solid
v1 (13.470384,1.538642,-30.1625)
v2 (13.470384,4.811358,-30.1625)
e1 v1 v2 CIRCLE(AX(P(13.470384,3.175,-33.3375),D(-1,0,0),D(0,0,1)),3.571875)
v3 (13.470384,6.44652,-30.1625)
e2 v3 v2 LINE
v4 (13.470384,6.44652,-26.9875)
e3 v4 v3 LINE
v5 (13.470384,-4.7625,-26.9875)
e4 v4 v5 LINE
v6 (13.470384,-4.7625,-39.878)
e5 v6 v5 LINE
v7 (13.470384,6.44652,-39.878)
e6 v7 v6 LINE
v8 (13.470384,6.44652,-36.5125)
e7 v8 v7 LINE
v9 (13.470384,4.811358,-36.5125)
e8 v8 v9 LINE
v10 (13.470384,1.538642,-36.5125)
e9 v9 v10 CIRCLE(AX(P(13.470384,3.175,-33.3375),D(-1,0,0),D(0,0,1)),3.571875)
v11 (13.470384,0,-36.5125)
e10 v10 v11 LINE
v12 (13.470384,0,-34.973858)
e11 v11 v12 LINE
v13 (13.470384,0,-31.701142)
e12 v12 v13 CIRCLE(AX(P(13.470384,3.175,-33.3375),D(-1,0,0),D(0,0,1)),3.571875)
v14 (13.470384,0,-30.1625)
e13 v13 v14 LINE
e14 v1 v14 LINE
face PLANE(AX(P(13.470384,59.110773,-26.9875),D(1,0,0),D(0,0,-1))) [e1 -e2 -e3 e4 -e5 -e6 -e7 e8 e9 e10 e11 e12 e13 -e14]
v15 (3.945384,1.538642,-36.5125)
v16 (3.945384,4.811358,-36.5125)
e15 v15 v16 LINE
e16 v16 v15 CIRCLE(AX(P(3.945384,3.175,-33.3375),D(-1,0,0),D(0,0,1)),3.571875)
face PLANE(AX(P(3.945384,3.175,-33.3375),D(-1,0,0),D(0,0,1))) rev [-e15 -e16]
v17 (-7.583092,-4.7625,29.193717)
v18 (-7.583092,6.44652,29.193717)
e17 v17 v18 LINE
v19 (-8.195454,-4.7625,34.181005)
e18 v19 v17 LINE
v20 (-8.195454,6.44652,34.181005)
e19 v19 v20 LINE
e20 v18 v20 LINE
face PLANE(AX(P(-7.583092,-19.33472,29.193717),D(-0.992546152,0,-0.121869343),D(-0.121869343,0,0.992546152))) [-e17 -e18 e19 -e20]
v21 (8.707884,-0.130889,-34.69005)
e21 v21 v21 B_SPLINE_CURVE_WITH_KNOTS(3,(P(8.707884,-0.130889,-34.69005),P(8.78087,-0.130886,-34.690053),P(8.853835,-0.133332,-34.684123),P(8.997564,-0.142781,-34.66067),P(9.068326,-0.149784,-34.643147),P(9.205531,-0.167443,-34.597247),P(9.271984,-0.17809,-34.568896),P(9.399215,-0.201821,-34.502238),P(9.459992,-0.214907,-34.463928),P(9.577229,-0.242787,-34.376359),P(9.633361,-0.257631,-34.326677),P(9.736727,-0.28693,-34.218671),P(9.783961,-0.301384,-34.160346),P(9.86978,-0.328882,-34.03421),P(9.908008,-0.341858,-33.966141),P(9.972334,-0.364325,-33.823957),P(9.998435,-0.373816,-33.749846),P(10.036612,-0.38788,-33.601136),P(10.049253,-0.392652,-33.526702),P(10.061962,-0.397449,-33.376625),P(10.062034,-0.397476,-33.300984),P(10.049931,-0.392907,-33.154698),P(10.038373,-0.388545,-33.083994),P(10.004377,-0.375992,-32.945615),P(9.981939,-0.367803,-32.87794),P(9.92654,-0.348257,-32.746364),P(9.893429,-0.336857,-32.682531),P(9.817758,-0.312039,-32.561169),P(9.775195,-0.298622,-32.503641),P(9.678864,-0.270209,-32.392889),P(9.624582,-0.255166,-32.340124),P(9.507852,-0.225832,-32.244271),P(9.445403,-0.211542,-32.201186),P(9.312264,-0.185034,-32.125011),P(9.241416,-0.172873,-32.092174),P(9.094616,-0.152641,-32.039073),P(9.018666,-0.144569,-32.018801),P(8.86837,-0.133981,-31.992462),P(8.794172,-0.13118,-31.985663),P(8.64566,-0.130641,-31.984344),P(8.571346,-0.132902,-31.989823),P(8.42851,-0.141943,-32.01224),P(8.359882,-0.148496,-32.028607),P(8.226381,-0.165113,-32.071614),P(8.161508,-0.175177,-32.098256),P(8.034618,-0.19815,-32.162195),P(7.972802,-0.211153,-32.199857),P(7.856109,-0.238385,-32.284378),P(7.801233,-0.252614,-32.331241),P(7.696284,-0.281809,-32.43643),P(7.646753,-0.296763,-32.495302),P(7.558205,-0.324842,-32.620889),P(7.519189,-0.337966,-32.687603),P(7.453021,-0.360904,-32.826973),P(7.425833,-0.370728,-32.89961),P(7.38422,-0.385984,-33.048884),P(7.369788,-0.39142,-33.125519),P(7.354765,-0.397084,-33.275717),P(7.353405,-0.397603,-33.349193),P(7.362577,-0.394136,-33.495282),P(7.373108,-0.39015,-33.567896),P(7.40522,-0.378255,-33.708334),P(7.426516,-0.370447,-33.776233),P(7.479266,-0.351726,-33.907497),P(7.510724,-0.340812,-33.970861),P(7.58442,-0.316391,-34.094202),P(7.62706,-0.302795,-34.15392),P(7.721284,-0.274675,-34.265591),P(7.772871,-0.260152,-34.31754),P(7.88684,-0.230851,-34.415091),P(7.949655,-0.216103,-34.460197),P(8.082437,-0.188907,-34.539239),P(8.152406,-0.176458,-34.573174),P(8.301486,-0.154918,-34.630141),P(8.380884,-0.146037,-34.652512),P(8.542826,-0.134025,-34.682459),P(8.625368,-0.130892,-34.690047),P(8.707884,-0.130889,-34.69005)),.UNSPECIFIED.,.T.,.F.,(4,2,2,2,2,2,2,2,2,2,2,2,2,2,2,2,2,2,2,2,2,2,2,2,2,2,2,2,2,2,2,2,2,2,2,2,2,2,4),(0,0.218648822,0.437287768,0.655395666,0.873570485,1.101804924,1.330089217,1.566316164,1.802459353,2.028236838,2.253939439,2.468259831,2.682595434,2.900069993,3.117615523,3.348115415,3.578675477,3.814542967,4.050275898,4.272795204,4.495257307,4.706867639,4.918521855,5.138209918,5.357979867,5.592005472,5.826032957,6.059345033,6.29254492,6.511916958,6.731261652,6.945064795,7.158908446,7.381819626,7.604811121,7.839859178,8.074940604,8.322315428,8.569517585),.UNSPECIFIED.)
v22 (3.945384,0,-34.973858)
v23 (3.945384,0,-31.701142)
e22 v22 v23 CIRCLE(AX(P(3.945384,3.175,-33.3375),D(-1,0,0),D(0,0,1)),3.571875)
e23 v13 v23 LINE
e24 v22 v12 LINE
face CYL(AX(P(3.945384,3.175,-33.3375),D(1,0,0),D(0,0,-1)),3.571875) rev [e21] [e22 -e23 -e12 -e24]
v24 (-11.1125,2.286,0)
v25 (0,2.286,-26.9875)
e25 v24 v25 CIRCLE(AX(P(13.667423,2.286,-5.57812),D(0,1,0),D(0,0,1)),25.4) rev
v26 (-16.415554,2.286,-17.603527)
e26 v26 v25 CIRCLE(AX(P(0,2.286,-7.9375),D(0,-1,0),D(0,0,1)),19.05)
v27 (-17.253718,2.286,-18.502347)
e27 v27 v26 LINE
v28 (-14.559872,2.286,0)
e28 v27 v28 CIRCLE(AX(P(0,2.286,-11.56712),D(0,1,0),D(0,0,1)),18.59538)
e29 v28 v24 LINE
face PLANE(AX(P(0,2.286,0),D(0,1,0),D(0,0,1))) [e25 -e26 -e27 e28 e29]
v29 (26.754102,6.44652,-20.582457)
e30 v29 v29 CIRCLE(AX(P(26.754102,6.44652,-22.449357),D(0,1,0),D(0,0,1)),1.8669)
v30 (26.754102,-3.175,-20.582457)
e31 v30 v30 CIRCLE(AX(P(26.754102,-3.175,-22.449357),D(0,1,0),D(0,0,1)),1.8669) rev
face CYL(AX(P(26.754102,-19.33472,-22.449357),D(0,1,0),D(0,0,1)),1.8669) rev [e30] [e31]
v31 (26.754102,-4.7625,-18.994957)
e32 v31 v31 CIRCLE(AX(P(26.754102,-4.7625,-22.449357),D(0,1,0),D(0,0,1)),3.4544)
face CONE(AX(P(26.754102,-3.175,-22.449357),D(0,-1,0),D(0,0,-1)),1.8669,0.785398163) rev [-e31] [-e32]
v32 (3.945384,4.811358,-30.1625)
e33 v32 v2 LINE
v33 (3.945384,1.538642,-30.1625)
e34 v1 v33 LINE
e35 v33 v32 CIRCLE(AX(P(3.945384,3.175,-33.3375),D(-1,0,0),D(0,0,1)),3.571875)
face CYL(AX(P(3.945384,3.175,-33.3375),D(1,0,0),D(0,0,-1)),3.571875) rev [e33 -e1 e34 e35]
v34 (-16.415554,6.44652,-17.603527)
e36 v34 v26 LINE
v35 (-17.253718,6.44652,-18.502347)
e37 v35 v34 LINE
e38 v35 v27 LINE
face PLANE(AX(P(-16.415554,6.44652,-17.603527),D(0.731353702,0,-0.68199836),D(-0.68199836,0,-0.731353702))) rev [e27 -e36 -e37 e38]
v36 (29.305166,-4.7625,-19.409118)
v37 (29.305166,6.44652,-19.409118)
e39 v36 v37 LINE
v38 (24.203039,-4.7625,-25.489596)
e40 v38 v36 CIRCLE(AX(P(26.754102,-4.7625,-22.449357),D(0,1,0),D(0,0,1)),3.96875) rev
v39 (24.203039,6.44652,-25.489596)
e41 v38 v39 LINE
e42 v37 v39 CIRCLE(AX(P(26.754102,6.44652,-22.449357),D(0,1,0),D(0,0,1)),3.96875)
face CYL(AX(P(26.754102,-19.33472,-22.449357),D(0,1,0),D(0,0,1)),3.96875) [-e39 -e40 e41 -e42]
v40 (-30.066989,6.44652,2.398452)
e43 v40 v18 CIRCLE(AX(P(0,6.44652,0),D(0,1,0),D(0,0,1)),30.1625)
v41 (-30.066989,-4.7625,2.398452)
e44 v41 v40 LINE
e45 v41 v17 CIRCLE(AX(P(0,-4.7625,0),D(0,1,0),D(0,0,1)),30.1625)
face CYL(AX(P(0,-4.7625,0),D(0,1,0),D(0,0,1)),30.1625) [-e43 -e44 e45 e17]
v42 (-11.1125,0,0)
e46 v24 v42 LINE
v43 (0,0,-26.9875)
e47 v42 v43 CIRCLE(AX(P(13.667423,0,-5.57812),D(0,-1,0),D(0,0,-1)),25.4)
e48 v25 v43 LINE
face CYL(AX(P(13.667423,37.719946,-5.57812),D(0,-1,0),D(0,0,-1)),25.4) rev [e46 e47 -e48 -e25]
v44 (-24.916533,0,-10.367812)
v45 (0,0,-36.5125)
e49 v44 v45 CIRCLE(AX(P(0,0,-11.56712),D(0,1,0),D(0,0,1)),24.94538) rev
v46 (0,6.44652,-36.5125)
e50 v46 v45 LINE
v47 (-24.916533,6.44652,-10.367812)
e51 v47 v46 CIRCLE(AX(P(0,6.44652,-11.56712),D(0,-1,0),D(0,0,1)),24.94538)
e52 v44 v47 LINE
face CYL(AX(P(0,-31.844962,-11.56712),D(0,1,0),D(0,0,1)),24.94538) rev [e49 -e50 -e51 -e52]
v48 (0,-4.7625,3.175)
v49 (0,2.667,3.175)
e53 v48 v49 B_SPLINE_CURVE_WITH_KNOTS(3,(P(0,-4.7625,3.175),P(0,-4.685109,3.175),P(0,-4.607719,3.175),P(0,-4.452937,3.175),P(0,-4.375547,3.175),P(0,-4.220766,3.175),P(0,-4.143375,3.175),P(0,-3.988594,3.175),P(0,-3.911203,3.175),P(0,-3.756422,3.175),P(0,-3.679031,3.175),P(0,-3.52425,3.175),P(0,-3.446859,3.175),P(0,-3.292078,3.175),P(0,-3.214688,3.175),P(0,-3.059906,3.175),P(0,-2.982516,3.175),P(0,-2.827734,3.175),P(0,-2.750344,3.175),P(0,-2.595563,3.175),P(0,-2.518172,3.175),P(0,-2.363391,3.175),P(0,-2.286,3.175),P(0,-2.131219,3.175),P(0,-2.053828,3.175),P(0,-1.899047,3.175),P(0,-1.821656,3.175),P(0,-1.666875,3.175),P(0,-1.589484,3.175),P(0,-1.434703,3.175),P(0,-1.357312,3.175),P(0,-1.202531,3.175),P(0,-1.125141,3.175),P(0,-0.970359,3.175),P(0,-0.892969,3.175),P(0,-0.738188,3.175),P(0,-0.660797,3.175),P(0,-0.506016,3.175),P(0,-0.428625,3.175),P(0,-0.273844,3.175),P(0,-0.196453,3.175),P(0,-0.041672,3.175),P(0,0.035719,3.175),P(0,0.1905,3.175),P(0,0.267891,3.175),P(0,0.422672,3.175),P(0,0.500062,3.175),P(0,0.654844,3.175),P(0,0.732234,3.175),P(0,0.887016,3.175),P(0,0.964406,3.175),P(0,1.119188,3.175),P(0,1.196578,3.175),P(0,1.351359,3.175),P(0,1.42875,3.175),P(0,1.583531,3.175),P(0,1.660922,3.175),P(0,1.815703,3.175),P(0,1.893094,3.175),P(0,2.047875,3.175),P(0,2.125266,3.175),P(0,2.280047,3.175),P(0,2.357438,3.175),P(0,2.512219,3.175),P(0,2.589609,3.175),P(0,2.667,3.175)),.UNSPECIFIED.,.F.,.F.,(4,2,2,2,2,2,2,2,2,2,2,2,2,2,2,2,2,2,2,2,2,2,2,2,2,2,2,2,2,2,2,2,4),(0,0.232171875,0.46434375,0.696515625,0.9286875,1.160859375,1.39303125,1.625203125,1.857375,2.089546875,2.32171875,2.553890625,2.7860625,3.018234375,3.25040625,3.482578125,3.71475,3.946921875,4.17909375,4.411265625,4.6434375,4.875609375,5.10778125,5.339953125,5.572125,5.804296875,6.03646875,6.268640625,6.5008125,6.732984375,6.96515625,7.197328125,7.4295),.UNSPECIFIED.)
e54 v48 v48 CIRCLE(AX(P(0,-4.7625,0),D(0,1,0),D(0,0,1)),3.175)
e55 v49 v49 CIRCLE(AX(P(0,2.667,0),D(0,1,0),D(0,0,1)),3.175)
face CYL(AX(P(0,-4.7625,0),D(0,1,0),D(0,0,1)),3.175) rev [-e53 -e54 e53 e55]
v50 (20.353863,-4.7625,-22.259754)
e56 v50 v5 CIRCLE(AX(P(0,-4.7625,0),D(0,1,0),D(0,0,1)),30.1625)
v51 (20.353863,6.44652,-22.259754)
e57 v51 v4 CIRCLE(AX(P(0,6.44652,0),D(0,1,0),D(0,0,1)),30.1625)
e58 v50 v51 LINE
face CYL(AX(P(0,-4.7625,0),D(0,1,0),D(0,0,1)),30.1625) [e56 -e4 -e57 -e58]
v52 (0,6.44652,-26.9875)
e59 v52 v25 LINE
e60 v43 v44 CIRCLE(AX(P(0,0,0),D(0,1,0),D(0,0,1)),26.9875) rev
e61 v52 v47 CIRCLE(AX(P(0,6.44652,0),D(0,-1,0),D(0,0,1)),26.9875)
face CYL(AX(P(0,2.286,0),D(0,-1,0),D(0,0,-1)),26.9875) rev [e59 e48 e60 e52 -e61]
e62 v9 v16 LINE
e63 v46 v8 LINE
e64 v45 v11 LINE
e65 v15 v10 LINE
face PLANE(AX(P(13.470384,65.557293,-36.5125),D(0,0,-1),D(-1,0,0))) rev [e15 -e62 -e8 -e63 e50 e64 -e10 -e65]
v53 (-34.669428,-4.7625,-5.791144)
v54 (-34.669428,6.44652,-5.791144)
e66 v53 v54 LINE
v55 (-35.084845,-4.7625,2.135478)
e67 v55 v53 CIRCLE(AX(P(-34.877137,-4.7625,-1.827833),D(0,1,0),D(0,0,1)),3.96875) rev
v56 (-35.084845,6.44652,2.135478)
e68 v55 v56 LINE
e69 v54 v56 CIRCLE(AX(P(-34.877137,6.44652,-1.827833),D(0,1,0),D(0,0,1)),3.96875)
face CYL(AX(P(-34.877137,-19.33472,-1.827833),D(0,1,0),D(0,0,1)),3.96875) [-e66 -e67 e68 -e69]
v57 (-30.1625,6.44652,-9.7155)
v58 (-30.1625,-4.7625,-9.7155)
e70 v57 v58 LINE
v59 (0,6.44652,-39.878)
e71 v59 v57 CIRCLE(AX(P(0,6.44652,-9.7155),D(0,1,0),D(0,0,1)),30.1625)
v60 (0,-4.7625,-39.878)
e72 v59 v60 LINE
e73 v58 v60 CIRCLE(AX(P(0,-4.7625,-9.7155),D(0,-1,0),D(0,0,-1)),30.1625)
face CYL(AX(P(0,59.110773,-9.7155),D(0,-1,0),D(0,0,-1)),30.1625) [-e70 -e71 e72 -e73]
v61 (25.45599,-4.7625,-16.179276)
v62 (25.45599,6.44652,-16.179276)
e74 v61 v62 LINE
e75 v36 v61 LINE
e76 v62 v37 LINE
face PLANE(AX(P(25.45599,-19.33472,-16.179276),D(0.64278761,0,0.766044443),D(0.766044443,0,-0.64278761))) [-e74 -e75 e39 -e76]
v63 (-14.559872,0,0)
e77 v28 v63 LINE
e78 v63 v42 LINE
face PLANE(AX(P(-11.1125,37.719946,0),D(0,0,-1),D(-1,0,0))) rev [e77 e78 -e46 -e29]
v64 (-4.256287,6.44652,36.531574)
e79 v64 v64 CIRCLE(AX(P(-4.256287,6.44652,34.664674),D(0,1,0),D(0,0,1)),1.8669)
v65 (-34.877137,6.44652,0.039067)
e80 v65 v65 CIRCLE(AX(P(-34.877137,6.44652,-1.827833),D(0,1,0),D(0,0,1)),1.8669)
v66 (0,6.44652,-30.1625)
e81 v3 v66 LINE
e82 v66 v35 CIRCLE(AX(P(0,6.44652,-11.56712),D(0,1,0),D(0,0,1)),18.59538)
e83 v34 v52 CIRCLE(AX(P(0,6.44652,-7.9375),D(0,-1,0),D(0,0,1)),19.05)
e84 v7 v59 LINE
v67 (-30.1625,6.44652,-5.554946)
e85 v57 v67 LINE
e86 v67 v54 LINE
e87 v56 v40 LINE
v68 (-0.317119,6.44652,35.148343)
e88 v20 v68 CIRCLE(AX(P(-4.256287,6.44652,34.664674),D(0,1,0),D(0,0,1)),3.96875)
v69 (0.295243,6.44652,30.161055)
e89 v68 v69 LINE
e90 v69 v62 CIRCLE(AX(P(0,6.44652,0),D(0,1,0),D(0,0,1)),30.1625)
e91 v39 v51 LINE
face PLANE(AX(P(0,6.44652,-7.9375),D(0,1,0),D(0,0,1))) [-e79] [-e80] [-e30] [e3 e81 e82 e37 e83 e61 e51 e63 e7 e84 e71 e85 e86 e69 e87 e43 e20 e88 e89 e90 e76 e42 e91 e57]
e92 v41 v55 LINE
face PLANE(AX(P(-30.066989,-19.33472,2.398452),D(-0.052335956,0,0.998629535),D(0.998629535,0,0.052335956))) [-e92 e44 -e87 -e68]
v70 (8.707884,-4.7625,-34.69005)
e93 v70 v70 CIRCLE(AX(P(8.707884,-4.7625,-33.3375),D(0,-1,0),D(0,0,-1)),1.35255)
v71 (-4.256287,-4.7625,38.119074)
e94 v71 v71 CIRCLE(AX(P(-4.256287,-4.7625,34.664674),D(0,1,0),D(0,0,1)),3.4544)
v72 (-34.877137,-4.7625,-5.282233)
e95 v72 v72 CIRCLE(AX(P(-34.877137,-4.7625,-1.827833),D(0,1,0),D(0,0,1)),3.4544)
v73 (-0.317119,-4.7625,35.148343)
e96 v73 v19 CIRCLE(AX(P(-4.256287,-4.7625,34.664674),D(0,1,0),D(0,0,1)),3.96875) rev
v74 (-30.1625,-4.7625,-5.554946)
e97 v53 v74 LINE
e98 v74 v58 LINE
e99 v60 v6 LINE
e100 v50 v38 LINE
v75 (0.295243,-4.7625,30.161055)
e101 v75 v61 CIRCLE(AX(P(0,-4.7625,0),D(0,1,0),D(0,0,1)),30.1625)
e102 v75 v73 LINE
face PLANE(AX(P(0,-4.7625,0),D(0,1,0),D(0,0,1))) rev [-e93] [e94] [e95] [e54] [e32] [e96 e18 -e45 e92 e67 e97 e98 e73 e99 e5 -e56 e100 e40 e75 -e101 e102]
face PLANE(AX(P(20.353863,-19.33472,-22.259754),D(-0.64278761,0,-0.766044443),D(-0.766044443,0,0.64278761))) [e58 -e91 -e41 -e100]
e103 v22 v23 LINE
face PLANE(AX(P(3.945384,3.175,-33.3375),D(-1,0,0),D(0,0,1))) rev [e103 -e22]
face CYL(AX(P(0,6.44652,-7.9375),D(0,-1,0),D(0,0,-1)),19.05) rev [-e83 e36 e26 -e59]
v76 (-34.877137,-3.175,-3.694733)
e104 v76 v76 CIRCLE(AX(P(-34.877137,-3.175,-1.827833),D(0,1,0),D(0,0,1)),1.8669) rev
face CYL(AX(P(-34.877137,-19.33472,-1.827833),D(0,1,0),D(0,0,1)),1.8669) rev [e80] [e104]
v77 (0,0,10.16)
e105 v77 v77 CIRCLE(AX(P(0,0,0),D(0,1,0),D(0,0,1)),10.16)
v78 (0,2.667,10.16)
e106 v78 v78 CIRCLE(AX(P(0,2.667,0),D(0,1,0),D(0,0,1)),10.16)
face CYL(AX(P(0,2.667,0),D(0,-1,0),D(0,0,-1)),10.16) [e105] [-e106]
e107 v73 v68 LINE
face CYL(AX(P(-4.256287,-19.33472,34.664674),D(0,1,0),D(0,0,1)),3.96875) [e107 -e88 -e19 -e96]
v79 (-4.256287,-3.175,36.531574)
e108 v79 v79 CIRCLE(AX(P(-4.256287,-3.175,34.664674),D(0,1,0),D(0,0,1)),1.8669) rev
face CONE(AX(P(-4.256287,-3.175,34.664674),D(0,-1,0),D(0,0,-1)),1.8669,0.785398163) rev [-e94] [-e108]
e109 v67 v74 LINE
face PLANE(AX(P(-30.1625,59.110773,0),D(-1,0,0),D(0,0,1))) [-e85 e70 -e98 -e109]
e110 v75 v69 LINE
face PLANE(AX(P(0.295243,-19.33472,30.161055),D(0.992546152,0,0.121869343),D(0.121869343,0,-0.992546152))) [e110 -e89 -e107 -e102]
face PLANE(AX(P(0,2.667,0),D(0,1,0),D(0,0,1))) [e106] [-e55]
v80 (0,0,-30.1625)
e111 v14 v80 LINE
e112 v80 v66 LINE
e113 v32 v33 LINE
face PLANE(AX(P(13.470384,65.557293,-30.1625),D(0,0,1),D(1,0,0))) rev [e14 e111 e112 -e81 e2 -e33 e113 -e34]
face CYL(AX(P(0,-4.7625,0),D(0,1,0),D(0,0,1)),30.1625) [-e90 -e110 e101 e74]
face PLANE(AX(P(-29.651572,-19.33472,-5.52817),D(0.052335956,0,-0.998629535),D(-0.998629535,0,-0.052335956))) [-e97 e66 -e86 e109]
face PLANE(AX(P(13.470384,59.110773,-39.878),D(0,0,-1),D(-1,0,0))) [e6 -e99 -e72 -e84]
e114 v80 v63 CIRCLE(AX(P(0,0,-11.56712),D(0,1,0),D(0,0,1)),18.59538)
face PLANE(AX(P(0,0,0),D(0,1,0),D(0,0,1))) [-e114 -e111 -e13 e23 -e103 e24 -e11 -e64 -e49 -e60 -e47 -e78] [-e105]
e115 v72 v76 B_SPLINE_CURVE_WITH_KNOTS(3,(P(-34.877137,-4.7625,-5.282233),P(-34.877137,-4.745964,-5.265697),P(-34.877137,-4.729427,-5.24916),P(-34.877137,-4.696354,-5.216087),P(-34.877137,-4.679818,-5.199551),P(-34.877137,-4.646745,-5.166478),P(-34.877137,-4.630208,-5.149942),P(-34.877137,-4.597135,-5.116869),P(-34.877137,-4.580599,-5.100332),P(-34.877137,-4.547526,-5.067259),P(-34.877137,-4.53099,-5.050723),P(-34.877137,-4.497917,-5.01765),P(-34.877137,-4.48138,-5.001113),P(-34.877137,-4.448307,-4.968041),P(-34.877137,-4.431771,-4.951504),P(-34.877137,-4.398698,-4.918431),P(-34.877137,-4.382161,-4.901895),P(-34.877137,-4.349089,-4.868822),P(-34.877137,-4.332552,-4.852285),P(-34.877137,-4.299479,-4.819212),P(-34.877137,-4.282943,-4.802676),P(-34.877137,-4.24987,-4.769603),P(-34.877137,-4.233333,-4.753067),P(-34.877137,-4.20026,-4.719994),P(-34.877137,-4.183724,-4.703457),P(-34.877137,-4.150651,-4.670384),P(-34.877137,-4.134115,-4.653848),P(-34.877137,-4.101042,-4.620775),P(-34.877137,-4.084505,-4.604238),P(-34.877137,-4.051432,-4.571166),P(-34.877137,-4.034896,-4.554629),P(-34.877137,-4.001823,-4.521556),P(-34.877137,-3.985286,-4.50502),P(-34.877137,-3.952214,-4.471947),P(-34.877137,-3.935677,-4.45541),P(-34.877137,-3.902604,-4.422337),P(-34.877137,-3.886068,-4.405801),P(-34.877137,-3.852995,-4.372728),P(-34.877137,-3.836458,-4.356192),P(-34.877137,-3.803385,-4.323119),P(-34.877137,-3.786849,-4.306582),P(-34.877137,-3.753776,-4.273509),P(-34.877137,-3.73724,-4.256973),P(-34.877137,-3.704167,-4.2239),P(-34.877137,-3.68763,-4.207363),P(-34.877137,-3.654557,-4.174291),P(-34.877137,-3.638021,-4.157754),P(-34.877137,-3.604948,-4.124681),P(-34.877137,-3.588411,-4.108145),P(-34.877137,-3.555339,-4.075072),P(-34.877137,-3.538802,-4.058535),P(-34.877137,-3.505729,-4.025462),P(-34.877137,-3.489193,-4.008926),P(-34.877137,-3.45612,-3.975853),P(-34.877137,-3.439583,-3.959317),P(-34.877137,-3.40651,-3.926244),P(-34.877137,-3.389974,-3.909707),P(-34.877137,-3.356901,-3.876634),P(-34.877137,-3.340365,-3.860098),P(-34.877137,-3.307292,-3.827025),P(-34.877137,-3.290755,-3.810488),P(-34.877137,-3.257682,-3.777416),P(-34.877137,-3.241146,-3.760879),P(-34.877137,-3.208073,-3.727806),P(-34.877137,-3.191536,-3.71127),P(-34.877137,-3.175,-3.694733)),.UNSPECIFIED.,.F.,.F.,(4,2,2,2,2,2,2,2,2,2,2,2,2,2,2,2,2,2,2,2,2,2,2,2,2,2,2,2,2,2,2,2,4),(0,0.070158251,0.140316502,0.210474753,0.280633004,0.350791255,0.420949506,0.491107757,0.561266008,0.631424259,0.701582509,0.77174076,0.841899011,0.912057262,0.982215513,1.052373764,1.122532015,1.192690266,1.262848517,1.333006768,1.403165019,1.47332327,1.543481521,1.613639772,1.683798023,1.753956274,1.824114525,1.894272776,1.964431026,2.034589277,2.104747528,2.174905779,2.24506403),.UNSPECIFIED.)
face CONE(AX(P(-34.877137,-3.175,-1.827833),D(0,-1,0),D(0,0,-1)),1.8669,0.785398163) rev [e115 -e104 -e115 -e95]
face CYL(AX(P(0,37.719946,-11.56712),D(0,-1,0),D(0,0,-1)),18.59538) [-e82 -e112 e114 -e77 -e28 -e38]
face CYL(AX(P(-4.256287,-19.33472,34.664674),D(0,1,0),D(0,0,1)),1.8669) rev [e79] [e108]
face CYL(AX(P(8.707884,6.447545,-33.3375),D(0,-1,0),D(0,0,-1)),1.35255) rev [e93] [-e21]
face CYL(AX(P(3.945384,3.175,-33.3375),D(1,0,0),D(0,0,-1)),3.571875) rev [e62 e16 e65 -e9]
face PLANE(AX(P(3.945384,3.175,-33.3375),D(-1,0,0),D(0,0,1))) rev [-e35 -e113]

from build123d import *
from build123d.topology import SkipClean

# Parameters (mm, degrees)
SKETCH1_R          = 30.1625
SKETCH1_R_2        = 3.175
EXTRUDE1_DEPTH     = 4.7625
EXTRUDE2_START     = 2.286
SKETCH2_R          = 30.1625
SKETCH2_R_2        = 26.9875
EXTRUDE2_DEPTH     = 2.286
EXTRUDE3_DEPTH     = 2.286
CUT_EXTRUDE1_START = -2.286
CUT_EXTRUDE1_DEPTH = 2.286
EXTRUDE4_DEPTH     = 4.16052
EXTRUDE6_START     = -4.7625
EXTRUDE6_DEPTH     = 4.7625
EXTRUDE7_START     = 6.44652
EXTRUDE7_DEPTH     = 6.44652
EXTRUDE8_START     = -4.7625
EXTRUDE8_OUTLINE_R = 1.8669
EXTRUDE8_DEPTH     = 11.20902
EXTRUDE8_START_2   = 3.945384182
EXTRUDE8_2_DEPTH   = 9.525
EXTRUDE9_START     = 2.667
SKETCH11_R         = 10.16
SKETCH11_R_2       = 3.175
EXTRUDE9_DEPTH     = 2.667
CHAMFER1_SIZE      = 1.5875
SPLIT1_OUTLINE_W   = 1.35255
SPLIT1_OUTLINE_H   = 4.631769236


# Read off the part's stored shape, not the designer's step: Extrude8, Split1
with BuildPart() as part:
    # Sketch1 → Extrude1 (new body)
    with BuildSketch(Plane(origin=(0, 0, 0), x_dir=(1, 0, 0), z_dir=(0, 1, 0))):
        with Locations(Location((0, 0, 0), (0, 0, 270))):
            Circle(SKETCH1_R)
        with Locations(Location((0, 0, 0), (0, 0, 270))):
            Circle(SKETCH1_R_2, mode=Mode.SUBTRACT)
    extrude(amount=-EXTRUDE1_DEPTH)

    # Sketch2 → Extrude2 (add)
    with BuildSketch(Plane(origin=(0, 0, 0), x_dir=(-1, 0, 0), z_dir=(0, 1, 0)).offset(EXTRUDE2_START)):
        with Locations(Location((0, 0, 0), (0, 0, 90))):
            Circle(SKETCH2_R)
        with Locations(Location((0, 0, 0), (0, 0, 90))):
            Circle(SKETCH2_R_2, mode=Mode.SUBTRACT)
    extrude(amount=-EXTRUDE2_DEPTH)

    # Sketch3 → Extrude3 (add)
    with BuildSketch(Plane(origin=(0, 0, 0), x_dir=(-1, 0, 0), z_dir=(0, 1, 0))):
        with BuildLine():
            Line((0, -26.9875), (0, -30.1625))
            ThreePointArc((0, -30.1625), (16.746389739, -19.65084319), (14.559871939, 0))
            Line((14.559871939, 0), (11.1125, 0))
            ThreePointArc((11.1125, 0), (9.819400834, -15.249165049), (0, -26.9875))
        make_face()
    extrude(amount=EXTRUDE3_DEPTH)

    # Sketch4 → Cut-Extrude1 (cut)
    with BuildSketch(Plane(origin=(0, 2.286, 0), x_dir=(-1, 0, 0), z_dir=(0, 1, 0)).offset(CUT_EXTRUDE1_START)):
        with BuildLine():
            ThreePointArc((0, -30.1625), (13.425358958, -27.009926751), (24.044290895, -18.211218564))
            ThreePointArc((24.044290895, -18.211218564), (24.79254584, -14.324226887), (24.91653318, -10.367812235))
            ThreePointArc((24.91653318, -10.367812235), (20.915943614, -17.054279785), (15.171790072, -22.31909367))
            ThreePointArc((15.171790072, -22.31909367), (8.539646316, -28.085673104), (0, -30.1625))
        make_face()
    extrude(amount=CUT_EXTRUDE1_DEPTH, mode=Mode.SUBTRACT)

    # Sketch5 → Extrude4 (add)
    with SkipClean():  # the faces are left unmerged after this step: merging them gives an invalid solid
        with BuildSketch(Plane(origin=(0, 2.286, 0), x_dir=(-1, 0, 0), z_dir=(0, 1, 0))):
            with BuildLine():
                ThreePointArc((0, -30.1625), (10.41213166, -26.974120661), (17.253717724, -18.502347019))
                Line((17.253717724, -18.502347019), (16.415554359, -17.603526852))
                ThreePointArc((16.415554359, -17.603526852), (9.454223619, -24.475944781), (0, -26.9875))
                ThreePointArc((0, -26.9875), (-14.975376849, 22.451352843), (24.91653318, -10.367812235))
                ThreePointArc((24.91653318, -10.367812235), (24.79254584, -14.324226887), (24.044290895, -18.211218564))
                ThreePointArc((24.044290895, -18.211218564), (-13.425358958, 27.009926751), (0, -30.1625))
            make_face()
        extrude(amount=EXTRUDE4_DEPTH)

    # Sketch7 → Extrude6 (add)
    with BuildSketch(Plane.XZ.offset(4.7625).offset(EXTRUDE6_START)):
        with BuildLine():
            Line((13.470384182, -39.878), (0, -39.878))
            ThreePointArc((0, -39.878), (-21.328108288, -31.043608288), (-30.1625, -9.7155))
            Line((-30.1625, -9.7155), (-30.1625, 0))
            ThreePointArc((-30.1625, 0), (-21.328108288, -21.328108288), (0, -30.1625))
            ThreePointArc((0, -30.1625), (6.919752073, -29.358021689), (13.470384182, -26.9875))
            Line((13.470384182, -26.9875), (13.470384182, -39.878))
        make_face()
    extrude(amount=EXTRUDE6_DEPTH)

    # Sketch8 → Extrude7 (add)
    with BuildSketch(Plane(origin=(0, 0, 0), x_dir=(-1, 0, 0), z_dir=(0, 1, 0)).offset(EXTRUDE7_START)):
        with BuildLine():
            Line((-13.470384182, -39.878), (-13.470384182, -36.5125))
            Line((-13.470384182, -36.5125), (0, -36.5125))
            ThreePointArc((0, -36.5125), (15.108481284, -31.416698661), (24.044290895, -18.211218564))
            ThreePointArc((24.044290895, -18.211218564), (28.592064724, -9.605740006), (30.1625, 0))
            Line((30.1625, 0), (30.1625, -9.7155))
            ThreePointArc((30.1625, -9.7155), (21.328108288, -31.043608288), (0, -39.878))
            Line((0, -39.878), (-13.470384182, -39.878))
        make_face()
        with BuildLine():
            Line((-13.470384182, -30.1625), (0, -30.1625))
            ThreePointArc((0, -30.1625), (-6.919752073, -29.358021689), (-13.470384182, -26.9875))
            Line((-13.470384182, -26.9875), (-13.470384182, -30.1625))
        make_face()
    extrude(amount=-EXTRUDE7_DEPTH)

    # Extrude8 outline → Extrude8 (add)
    # profile 1 of 3: a face of its own
    with BuildSketch(Plane(origin=(0, 0, 0), x_dir=(1, 0, 0), z_dir=(0, 1, 0)).offset(EXTRUDE8_START)):
        with BuildLine():
            Line((-30.1625, 0), (-30.1625, 5.554946141))
            Line((-30.1625, 5.554946141), (-34.669428175, 5.791144238))
            ThreePointArc((-34.669428175, 5.791144238), (-38.840447467, 2.035541598), (-35.084844828, -2.135477694))
            Line((-35.084844828, -2.135477694), (-30.066989082, -2.398452371))
            ThreePointArc((-30.066989082, -2.398452371), (-30.138612812, -1.200176665), (-30.1625, 0))
        make_face()
        with Locations((-34.877136501, 1.827833272)):
            Circle(EXTRUDE8_OUTLINE_R, mode=Mode.SUBTRACT)
    # profile 2 of 3: a face of its own
    with BuildSketch(Plane(origin=(0, 0, 0), x_dir=(1, 0, 0), z_dir=(0, 1, 0)).offset(EXTRUDE8_START)):
        with BuildLine():
            ThreePointArc((20.353863178, 22.259754266), (23.105815515, 19.388081277), (25.45598983, 16.179276498))
            Line((25.45598983, 16.179276498), (29.305165502, 19.409118385))
            ThreePointArc((29.305165502, 19.409118385), (29.79434106, 25.000420595), (24.20303885, 25.489596152))
            Line((24.20303885, 25.489596152), (20.353863178, 22.259754266))
        make_face()
        with Locations((26.754102176, 22.449357268)):
            Circle(EXTRUDE8_OUTLINE_R, mode=Mode.SUBTRACT)
    # profile 3 of 3: a face of its own
    with BuildSketch(Plane(origin=(0, 0, 0), x_dir=(1, 0, 0), z_dir=(0, 1, 0)).offset(EXTRUDE8_START)):
        with BuildLine():
            ThreePointArc((0.295242727, -30.161054988), (-3.67588407, -29.937673299), (-7.583092352, -29.193717074))
            Line((-7.583092352, -29.193717074), (-8.195454358, -34.181005389))
            ThreePointArc((-8.195454358, -34.181005389), (-4.739955775, -38.603841885), (-0.317119279, -35.148343303))
            Line((-0.317119279, -35.148343303), (0.295242727, -30.161054988))
        make_face()
        with Locations((-4.256286818, -34.664674346)):
            Circle(EXTRUDE8_OUTLINE_R, mode=Mode.SUBTRACT)
    extrude(amount=EXTRUDE8_DEPTH)

    # Extrude8 2 outline → Extrude8 2 (cut)
    with BuildSketch(Plane.YZ.offset(EXTRUDE8_START_2)):
        with BuildLine():
            Line((1.538642455, -30.1625), (4.811357545, -30.1625))
            ThreePointArc((4.811357545, -30.1625), (3.175, -29.765625), (1.538642455, -30.1625))
        make_face()
        with BuildLine():
            Line((0, -34.973857545), (0, -31.701142455))
            ThreePointArc((0, -31.701142455), (-0.396875, -33.3375), (0, -34.973857545))
        make_face()
        with BuildLine():
            ThreePointArc((1.538642455, -36.5125), (3.175, -36.909375), (4.811357545, -36.5125))
            Line((4.811357545, -36.5125), (1.538642455, -36.5125))
        make_face()
    extrude(amount=EXTRUDE8_2_DEPTH, mode=Mode.SUBTRACT)

    # Sketch11 → Extrude9 (add)
    with BuildSketch(Plane(origin=(0, 0, 0), x_dir=(-1, 0, 0), z_dir=(0, 1, 0)).offset(EXTRUDE9_START)):
        with Locations(Location((0, 0, 0), (0, 0, 90))):
            Circle(SKETCH11_R)
        with Locations(Location((0, 0, 0), (0, 0, 90))):
            Circle(SKETCH11_R_2, mode=Mode.SUBTRACT)
    extrude(amount=-EXTRUDE9_DEPTH)

    # Chamfer1
    chamfer1_edges = [part.edges().sort_by_distance(p)[0] for p in [
        (-36.744036501, -4.7625, -1.827833272),
        (-6.123186818, -4.7625, 34.664674346),
        (24.887202176, -4.7625, -22.449357268),
    ]]
    chamfer(chamfer1_edges, length=CHAMFER1_SIZE)

    # Split1 outline → Split1 (revolve, cut)
    with SkipClean():  # the faces are left unmerged after this step: merging them gives an invalid solid
        with BuildSketch(Plane(origin=(8.707884182, 0, -33.3375), x_dir=(1, 0, 0), z_dir=(0, 0, 1))):
            with Locations((0.676275, -2.446615382)):
                Rectangle(SPLIT1_OUTLINE_W, SPLIT1_OUTLINE_H)
        revolve(axis=Axis((8.707884182, 0, -33.3375), (0, 1, 0)), mode=Mode.SUBTRACT)


solid = part.part
